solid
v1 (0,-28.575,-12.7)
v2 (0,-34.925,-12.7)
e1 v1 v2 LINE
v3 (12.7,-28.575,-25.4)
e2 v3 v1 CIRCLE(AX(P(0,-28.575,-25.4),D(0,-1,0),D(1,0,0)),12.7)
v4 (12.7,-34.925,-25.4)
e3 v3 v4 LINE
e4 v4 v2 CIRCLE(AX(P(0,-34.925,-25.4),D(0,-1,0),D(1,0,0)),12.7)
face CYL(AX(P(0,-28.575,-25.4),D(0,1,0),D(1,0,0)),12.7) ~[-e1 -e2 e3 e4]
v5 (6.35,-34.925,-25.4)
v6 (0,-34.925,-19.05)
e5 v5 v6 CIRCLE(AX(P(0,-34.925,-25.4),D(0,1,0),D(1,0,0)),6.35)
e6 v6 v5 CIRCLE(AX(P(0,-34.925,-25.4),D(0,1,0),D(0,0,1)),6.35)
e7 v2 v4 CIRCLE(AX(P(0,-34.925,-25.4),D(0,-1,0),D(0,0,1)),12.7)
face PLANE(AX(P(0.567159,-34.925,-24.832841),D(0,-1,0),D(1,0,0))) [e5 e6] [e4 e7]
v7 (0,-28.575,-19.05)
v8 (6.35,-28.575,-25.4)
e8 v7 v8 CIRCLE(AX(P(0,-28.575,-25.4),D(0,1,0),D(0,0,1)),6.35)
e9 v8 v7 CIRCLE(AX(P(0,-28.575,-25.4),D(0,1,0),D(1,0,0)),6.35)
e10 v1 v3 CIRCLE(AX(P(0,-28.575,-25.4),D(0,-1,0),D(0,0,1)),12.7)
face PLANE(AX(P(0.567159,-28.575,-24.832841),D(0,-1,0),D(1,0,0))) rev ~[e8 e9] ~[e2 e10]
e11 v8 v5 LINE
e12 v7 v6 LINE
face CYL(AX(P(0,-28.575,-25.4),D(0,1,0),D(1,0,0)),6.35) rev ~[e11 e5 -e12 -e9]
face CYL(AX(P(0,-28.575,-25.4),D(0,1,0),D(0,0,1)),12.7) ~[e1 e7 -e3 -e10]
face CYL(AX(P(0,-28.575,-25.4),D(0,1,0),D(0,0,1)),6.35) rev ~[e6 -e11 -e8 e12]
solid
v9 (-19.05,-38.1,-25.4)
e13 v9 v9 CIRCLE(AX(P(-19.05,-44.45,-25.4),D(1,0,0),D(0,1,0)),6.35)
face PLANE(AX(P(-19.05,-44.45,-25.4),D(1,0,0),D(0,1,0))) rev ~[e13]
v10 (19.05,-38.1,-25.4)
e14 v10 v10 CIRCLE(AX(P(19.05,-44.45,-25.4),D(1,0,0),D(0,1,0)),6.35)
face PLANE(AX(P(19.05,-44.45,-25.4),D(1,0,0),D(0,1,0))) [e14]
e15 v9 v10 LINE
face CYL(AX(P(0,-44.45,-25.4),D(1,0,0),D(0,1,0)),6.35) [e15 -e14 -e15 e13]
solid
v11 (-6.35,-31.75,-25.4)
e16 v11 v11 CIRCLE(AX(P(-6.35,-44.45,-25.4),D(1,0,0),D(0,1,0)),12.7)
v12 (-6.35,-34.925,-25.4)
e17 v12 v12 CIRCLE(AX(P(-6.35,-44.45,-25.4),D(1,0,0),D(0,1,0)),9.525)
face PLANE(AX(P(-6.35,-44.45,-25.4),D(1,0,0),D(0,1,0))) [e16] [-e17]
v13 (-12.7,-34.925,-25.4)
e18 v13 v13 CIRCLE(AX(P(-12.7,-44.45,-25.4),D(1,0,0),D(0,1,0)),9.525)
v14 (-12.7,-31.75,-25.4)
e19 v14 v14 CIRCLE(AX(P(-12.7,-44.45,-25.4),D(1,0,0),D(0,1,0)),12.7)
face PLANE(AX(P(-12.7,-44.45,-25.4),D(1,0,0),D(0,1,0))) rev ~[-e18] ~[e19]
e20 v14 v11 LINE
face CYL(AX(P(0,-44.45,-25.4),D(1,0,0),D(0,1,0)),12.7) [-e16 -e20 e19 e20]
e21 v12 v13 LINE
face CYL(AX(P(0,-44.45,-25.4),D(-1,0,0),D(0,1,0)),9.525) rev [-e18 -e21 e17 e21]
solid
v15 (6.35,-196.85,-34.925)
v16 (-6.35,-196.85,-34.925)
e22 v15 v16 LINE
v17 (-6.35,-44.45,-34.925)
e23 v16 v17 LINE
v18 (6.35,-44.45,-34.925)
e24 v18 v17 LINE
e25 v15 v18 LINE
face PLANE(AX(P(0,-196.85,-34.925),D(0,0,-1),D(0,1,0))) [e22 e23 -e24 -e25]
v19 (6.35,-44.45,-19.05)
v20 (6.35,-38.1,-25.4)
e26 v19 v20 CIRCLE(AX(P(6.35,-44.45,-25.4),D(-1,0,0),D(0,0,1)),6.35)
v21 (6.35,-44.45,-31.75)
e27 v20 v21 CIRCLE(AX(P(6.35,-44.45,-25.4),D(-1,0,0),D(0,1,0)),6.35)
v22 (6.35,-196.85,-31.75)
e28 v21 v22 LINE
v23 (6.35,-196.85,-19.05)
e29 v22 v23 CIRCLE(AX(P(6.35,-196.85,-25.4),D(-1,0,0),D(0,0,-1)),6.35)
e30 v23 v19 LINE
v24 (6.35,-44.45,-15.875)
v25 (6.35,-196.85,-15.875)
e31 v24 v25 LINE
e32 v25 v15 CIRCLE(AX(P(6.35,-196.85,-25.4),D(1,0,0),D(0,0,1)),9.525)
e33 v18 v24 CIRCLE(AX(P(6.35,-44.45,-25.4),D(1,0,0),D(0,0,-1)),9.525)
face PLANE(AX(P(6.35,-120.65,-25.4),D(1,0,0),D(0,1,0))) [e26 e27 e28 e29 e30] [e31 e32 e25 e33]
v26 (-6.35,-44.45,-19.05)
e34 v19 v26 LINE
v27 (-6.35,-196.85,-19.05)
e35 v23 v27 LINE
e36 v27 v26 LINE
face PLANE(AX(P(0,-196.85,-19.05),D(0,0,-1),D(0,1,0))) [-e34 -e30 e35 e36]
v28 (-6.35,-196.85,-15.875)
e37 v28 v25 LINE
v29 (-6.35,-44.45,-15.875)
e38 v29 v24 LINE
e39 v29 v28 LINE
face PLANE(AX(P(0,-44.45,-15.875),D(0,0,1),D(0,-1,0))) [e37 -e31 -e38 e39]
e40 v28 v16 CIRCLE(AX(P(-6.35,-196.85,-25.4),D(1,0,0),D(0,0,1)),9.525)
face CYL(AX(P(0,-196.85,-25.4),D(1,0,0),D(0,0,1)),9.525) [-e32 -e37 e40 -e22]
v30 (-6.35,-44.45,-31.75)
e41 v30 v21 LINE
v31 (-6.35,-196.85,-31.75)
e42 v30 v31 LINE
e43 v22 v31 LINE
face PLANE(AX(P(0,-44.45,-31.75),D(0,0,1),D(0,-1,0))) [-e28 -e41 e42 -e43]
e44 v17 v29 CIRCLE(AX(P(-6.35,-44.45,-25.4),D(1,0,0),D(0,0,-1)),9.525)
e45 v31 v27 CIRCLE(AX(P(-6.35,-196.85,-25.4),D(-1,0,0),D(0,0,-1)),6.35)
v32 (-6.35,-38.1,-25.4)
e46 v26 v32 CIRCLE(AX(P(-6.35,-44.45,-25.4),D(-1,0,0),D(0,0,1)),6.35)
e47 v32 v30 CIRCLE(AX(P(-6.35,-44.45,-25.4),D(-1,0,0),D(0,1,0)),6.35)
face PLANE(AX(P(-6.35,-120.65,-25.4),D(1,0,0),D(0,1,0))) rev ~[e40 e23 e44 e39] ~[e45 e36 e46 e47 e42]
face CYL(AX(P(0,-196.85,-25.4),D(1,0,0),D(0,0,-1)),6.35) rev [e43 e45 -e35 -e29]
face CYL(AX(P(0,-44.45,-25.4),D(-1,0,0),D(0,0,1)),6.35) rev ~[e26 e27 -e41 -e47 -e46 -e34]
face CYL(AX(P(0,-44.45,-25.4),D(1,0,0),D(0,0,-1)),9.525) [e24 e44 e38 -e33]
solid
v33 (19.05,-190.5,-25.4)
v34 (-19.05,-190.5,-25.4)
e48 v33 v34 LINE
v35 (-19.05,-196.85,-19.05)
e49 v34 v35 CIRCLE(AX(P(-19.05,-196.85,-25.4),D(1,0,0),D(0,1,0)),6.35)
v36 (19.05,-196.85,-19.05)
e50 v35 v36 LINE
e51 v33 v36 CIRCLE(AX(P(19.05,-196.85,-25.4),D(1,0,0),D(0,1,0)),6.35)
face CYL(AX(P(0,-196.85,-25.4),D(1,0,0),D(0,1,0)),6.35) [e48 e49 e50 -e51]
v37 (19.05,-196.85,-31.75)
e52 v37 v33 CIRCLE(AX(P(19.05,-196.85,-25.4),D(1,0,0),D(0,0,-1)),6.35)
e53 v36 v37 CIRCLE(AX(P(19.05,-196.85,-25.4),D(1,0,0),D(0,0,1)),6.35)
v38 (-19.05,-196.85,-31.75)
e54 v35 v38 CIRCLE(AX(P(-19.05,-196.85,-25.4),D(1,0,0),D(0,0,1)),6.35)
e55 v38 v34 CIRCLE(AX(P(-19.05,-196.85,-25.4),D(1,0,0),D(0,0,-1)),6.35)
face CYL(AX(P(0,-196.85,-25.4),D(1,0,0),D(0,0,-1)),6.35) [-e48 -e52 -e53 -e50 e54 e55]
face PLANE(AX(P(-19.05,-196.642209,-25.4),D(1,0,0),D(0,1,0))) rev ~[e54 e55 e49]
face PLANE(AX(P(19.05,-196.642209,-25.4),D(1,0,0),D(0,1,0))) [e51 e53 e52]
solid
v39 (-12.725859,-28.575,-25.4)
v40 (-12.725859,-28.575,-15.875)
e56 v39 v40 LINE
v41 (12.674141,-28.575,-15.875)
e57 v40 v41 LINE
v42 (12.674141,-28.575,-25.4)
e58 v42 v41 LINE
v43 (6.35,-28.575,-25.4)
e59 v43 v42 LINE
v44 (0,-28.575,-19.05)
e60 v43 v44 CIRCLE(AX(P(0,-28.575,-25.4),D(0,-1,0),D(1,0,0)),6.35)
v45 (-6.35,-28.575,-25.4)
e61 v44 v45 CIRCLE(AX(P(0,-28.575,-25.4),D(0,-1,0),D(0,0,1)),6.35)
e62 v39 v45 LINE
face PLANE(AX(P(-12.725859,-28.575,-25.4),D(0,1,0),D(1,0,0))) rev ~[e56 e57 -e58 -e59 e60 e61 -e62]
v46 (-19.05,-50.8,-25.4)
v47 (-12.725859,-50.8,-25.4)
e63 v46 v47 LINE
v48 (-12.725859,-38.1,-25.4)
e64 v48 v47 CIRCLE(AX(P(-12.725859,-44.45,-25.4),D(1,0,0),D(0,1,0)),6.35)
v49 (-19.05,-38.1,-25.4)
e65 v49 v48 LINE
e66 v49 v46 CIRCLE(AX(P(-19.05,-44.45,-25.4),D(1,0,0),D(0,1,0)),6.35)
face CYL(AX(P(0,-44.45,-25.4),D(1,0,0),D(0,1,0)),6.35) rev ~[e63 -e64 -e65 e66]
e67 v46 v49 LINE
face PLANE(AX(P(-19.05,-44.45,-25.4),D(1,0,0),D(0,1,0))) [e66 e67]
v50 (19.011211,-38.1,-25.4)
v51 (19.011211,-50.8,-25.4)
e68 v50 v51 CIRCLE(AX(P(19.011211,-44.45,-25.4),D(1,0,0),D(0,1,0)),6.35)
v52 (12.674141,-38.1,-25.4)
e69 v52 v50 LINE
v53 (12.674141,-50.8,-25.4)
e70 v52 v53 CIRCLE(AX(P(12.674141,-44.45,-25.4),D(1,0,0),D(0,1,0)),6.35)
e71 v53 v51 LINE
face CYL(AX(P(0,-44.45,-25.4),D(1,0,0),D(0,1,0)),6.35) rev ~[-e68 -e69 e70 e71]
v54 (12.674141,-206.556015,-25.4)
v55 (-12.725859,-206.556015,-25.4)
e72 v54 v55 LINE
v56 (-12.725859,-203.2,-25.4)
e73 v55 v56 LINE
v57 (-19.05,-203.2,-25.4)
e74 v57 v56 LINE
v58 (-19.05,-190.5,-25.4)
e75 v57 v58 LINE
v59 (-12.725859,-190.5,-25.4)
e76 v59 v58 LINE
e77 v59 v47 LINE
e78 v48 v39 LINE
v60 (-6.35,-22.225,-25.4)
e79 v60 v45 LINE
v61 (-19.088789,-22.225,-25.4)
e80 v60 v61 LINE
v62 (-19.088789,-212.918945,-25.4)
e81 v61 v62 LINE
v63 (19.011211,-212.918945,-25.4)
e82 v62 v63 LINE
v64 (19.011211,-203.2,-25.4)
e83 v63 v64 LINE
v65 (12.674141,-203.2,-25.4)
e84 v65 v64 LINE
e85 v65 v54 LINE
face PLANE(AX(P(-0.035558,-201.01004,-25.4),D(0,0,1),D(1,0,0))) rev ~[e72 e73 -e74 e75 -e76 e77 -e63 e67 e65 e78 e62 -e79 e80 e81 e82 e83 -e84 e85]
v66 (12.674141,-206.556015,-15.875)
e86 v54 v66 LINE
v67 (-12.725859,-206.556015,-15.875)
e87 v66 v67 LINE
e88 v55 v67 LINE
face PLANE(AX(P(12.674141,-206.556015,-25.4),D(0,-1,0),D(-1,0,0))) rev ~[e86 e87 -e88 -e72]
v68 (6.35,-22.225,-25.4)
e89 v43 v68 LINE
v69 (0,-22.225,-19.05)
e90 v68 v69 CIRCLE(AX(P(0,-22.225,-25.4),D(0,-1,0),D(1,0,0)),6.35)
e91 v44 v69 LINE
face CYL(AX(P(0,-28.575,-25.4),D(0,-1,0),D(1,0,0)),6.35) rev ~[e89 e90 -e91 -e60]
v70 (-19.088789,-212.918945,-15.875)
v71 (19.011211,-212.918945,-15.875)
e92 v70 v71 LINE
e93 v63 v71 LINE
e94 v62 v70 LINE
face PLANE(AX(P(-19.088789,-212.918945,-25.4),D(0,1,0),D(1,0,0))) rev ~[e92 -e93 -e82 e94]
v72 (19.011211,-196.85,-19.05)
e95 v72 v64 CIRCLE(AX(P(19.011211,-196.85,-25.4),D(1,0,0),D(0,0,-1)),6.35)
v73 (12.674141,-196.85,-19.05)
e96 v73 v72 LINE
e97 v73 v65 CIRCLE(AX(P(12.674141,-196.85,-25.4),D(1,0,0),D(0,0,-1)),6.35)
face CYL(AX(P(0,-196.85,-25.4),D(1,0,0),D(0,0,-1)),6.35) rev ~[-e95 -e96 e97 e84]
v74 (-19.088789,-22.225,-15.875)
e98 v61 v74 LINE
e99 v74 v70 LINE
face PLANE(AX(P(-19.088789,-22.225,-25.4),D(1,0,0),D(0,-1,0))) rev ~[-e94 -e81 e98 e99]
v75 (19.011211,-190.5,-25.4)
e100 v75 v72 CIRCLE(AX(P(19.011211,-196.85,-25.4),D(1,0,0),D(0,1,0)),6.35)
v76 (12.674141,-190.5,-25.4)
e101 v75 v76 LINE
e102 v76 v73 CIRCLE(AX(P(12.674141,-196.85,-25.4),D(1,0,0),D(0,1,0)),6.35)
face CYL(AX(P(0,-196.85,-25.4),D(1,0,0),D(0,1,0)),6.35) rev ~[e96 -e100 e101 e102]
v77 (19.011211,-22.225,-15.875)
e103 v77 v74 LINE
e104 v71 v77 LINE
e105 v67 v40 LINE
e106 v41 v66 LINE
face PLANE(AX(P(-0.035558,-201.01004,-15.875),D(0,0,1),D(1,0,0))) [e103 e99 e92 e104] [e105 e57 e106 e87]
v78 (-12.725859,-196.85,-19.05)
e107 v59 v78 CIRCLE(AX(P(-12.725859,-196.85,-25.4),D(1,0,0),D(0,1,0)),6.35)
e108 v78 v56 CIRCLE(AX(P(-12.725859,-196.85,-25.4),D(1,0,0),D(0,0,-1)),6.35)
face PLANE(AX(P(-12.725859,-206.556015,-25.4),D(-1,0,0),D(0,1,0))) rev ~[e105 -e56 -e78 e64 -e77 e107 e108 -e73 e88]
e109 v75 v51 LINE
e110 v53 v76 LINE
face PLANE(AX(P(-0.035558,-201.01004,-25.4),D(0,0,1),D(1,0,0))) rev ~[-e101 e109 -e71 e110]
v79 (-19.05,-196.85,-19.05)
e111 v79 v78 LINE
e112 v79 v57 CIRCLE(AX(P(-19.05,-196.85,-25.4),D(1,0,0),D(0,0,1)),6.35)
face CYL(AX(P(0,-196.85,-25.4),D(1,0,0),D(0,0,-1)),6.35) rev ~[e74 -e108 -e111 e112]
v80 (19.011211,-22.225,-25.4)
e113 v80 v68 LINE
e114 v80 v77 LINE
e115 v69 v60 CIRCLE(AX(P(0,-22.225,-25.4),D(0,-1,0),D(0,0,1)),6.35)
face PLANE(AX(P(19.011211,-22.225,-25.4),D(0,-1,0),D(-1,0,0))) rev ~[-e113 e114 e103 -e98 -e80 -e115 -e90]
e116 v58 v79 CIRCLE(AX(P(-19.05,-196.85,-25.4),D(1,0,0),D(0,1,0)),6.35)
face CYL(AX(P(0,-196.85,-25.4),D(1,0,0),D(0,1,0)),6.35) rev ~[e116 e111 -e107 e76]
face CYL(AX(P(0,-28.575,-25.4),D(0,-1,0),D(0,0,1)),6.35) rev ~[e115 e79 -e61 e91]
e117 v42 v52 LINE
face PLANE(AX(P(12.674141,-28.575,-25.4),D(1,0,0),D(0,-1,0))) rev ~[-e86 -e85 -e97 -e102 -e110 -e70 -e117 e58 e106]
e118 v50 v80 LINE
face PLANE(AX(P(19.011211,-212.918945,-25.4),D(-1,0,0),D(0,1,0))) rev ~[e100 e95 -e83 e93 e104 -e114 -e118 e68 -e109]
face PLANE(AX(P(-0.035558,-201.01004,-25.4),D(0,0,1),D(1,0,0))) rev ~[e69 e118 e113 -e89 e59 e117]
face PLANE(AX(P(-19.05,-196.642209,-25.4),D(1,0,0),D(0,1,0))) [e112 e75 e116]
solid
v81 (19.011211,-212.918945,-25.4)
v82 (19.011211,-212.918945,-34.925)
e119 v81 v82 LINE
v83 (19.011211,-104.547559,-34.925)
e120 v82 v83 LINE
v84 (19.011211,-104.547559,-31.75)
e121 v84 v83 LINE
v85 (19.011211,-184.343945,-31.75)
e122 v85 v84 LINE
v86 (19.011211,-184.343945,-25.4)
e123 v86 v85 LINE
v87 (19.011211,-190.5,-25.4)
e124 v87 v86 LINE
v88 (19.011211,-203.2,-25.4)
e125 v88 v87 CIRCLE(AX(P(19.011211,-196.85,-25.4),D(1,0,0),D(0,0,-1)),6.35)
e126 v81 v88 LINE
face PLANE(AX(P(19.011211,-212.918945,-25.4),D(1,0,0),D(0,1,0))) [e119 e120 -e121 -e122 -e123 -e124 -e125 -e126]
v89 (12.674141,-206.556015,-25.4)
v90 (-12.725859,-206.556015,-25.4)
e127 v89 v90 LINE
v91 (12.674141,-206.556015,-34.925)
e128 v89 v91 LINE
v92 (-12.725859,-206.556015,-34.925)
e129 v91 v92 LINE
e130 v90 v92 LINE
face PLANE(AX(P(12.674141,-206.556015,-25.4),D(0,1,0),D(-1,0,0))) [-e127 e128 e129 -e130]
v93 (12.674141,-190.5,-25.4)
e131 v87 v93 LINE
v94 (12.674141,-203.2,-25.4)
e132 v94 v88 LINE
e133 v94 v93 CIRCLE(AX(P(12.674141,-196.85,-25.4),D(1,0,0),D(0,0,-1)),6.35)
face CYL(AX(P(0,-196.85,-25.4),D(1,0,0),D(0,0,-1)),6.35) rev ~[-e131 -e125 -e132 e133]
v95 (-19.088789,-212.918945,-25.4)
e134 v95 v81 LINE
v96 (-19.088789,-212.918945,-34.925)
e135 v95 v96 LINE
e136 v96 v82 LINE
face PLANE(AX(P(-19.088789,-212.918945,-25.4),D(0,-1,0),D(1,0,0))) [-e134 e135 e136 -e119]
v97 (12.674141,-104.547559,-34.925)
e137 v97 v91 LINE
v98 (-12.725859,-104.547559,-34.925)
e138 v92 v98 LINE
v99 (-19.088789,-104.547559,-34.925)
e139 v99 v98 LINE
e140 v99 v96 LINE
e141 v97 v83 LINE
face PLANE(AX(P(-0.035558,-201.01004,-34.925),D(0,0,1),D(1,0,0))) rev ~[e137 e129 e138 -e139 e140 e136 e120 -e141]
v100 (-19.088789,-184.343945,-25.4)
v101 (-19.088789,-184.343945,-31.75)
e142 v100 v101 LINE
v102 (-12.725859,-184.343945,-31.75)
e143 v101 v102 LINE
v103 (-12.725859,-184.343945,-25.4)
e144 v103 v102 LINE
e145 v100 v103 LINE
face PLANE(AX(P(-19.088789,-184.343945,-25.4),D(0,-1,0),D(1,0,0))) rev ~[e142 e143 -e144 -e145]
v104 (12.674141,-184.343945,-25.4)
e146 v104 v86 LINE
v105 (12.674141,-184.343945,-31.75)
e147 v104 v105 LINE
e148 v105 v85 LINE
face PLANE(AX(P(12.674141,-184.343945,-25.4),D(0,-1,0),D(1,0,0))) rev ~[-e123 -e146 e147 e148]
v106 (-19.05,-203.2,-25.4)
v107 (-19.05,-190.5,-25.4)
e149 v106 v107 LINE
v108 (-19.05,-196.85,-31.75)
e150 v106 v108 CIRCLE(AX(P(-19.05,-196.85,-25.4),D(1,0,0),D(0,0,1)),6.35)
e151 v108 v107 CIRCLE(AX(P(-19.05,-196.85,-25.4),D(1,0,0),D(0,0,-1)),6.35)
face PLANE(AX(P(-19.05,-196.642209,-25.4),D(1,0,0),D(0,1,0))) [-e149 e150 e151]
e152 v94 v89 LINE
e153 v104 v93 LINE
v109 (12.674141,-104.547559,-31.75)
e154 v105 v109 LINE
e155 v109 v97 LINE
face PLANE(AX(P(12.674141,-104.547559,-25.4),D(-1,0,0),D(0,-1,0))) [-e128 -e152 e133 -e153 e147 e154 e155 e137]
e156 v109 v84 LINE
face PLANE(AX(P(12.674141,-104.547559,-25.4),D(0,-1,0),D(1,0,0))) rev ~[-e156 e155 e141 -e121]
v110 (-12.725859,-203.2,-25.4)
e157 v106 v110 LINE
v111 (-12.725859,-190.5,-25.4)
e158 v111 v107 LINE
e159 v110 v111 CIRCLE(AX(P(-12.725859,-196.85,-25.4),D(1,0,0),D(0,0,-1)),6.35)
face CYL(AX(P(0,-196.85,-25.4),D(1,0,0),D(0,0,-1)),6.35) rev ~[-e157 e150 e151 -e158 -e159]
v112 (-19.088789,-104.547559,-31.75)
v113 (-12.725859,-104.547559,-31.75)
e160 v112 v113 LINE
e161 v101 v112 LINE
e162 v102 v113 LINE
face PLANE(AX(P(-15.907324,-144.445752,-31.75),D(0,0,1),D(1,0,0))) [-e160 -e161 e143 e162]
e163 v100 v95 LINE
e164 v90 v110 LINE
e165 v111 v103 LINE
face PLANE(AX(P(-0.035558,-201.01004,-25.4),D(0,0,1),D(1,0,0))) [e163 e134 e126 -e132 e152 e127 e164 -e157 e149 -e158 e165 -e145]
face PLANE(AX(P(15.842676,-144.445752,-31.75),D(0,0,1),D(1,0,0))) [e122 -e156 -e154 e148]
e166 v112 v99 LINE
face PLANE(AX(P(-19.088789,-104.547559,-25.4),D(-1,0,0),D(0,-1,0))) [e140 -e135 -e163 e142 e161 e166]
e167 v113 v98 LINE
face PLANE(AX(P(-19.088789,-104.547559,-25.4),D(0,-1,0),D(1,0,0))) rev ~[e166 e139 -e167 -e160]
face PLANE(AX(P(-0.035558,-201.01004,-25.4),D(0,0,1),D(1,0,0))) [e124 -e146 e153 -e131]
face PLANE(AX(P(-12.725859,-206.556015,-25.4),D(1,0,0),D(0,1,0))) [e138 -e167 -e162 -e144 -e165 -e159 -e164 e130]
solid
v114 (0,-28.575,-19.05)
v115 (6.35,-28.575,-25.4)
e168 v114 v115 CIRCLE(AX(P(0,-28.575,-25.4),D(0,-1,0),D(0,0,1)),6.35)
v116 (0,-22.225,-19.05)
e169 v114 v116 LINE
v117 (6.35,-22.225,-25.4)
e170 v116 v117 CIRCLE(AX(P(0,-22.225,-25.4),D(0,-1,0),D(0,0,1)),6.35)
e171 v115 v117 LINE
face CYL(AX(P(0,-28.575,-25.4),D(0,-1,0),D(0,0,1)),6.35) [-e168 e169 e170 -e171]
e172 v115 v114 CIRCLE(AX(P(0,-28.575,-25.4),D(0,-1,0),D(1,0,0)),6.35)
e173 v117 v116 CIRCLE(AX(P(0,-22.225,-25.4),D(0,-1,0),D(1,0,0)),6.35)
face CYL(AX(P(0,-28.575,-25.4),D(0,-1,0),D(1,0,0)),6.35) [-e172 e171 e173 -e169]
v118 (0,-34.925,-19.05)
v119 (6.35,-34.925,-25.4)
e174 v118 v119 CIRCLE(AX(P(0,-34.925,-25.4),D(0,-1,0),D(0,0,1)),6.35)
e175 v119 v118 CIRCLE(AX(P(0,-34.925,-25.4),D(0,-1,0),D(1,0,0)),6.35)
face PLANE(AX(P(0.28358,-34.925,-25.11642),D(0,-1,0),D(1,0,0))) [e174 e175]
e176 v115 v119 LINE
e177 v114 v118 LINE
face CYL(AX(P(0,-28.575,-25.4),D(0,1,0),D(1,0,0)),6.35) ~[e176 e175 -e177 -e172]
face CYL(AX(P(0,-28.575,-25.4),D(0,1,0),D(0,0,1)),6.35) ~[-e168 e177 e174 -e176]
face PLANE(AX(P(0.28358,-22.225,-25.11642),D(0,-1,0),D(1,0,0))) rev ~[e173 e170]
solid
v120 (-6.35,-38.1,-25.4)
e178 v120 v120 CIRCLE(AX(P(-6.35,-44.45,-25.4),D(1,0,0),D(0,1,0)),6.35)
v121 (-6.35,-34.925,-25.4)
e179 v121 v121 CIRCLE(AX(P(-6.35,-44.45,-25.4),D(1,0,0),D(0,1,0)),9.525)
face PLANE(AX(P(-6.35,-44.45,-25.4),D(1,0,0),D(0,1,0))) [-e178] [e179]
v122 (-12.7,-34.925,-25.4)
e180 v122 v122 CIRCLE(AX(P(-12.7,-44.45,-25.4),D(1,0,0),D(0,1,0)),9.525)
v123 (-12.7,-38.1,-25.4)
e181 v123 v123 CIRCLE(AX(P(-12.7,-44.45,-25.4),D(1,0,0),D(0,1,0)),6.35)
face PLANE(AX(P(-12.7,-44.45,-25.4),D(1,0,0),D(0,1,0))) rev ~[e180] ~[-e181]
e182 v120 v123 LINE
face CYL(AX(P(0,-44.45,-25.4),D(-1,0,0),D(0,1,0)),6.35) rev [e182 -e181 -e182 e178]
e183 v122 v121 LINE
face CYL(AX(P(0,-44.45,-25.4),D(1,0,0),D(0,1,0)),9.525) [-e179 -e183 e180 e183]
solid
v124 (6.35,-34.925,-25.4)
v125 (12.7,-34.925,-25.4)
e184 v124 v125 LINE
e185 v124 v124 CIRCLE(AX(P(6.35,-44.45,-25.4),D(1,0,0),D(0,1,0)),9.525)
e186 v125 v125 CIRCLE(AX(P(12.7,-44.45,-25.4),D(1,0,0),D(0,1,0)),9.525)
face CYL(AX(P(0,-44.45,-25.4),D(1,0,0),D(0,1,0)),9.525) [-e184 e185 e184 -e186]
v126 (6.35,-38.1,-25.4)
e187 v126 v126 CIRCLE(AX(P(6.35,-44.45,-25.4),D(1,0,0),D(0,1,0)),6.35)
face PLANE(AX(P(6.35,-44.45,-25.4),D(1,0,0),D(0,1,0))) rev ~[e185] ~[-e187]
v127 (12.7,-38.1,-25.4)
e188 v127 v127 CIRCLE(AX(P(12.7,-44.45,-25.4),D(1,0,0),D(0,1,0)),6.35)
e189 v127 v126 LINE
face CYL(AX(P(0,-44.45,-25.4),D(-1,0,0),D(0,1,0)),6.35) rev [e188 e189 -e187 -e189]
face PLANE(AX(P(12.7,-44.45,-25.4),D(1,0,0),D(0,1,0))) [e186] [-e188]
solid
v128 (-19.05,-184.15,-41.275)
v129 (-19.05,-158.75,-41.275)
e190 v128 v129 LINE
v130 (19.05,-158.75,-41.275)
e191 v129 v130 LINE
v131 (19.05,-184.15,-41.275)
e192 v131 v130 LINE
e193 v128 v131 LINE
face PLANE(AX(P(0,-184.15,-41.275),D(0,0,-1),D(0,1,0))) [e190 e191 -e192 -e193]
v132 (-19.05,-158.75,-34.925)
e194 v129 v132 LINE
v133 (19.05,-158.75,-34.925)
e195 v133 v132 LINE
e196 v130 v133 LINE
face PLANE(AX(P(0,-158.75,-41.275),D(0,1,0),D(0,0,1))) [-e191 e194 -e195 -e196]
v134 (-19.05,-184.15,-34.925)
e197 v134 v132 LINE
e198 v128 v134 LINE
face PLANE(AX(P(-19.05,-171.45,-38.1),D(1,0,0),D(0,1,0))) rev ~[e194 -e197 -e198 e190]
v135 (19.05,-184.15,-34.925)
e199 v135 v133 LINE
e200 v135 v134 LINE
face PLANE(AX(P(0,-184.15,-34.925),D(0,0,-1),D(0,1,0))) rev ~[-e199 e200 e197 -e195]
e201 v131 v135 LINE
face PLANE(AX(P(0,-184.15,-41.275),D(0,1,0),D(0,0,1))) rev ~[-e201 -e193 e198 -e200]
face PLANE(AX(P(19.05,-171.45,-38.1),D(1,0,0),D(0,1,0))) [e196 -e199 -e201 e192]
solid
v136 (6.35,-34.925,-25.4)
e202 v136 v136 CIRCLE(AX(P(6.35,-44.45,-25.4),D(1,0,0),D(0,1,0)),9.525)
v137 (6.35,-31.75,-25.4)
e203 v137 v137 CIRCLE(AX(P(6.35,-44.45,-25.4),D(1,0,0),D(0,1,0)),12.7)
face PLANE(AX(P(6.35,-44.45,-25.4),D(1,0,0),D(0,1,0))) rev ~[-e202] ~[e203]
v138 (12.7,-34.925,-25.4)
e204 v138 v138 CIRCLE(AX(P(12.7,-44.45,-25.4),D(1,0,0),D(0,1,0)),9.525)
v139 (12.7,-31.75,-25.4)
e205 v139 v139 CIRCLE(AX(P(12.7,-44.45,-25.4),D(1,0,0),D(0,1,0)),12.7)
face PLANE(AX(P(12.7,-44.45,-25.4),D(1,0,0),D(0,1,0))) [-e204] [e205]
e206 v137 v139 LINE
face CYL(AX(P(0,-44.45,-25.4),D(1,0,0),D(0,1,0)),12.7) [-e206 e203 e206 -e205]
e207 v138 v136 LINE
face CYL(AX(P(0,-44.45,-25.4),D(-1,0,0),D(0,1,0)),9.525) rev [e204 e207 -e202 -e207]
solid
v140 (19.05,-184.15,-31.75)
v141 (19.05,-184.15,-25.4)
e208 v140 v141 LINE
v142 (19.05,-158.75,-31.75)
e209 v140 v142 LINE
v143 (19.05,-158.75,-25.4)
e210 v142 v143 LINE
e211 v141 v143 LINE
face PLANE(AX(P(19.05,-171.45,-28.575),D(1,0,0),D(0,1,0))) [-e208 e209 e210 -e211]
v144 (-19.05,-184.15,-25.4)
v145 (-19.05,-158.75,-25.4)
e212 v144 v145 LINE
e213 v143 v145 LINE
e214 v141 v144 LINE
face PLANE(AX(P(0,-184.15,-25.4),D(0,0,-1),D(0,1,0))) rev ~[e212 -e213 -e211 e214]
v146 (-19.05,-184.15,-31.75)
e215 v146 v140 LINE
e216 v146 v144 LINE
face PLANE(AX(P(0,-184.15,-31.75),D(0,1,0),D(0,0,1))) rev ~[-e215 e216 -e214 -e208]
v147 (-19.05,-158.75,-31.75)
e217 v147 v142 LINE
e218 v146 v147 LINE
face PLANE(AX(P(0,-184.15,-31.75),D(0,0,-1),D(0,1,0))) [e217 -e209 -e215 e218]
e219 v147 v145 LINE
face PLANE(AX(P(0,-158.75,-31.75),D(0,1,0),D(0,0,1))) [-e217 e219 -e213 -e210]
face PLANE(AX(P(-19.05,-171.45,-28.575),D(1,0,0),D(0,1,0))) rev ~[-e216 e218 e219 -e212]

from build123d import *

# Parameters (mm, degrees)
F2_DEPTH  = 6.35
F3_R      = 12.7
F3_R_2    = 9.525
F4_DEPTH  = 12.7
F5_DEPTH  = 6.35
F3_R_3    = 6.35
F6_DEPTH  = 19.05
F7_DEPTH  = 12.7
F8_DEPTH  = 6.35
F10_DEPTH = 6.35
F11_DEPTH = 19.05
F9_W      = 25.4
F9_H      = 6.35
F12_DEPTH = 19.05
F13_DEPTH = 6.35
F15_W     = 6.3629296671
F15_H     = 79.796386
F15_W_2   = 6.3370703329
F16_DEPTH = 9.525
F17_DEPTH = 6.35
F18_DEPTH = 9.525


# Not quite as in the source:
# - a feature names something its author has since deleted; it is built from what else it names


with BuildPart() as f2:
    # F1 (on offset) → F2 (new body)
    with BuildSketch(Plane.XZ.offset(28.575)):
        with BuildLine():
            ThreePointArc((12.7, -25.4), (8.9802561211, -16.4197438789), (0, -12.7))
            ThreePointArc((0, -12.7), (-8.9802561211, -34.3802561211), (12.7, -25.4))
        make_face()
        with BuildLine():
            ThreePointArc((6.35, -25.4), (-4.4901280605, -29.8901280605), (0, -19.05))
            ThreePointArc((0, -19.05), (4.4901280605, -20.9098719395), (6.35, -25.4))
        make_face(mode=Mode.SUBTRACT)
    extrude(amount=F2_DEPTH)


with BuildPart() as f4:
    # F3 (on Right) → F4 (new body, symmetric)
    with BuildSketch(Plane.YZ):
        with Locations((-44.45, -25.4)):
            Circle(F3_R)
        with Locations((-44.45, -25.4)):
            Circle(F3_R_2, mode=Mode.SUBTRACT)
    extrude(amount=F4_DEPTH, both=True)

    # F3 (on Right) → F5 (cut, symmetric)
    with BuildSketch(Plane.YZ):
        with Locations((-44.45, -25.4)):
            Circle(F3_R)
        with Locations((-44.45, -25.4)):
            Circle(F3_R_2, mode=Mode.SUBTRACT)
    extrude(amount=F5_DEPTH, both=True, mode=Mode.SUBTRACT)


with BuildPart() as f6:
    # F3 (on Right) → F6 (new body, symmetric)
    with BuildSketch(Plane.YZ):
        with Locations((-44.45, -25.4)):
            Circle(F3_R_3)
    extrude(amount=F6_DEPTH, both=True)


with BuildPart() as f7:
    # F3 (on Right) → F7 (new body, symmetric)
    with BuildSketch(Plane.YZ):
        with Locations((-44.45, -25.4)):
            Circle(F3_R_2)
        with Locations((-44.45, -25.4)):
            Circle(F3_R_3, mode=Mode.SUBTRACT)
    extrude(amount=F7_DEPTH, both=True)

    # F3 (on Right) → F8 (cut, symmetric)
    with BuildSketch(Plane.YZ):
        with Locations((-44.45, -25.4)):
            Circle(F3_R_2)
        with Locations((-44.45, -25.4)):
            Circle(F3_R_3, mode=Mode.SUBTRACT)
    extrude(amount=F8_DEPTH, both=True, mode=Mode.SUBTRACT)


with BuildPart() as f10:
    # F9 (on Right) → F10 (new body, symmetric)
    with BuildSketch(Plane.YZ):
        with BuildLine():
            Line((-158.75, -34.925), (-44.45, -34.925))
            ThreePointArc((-44.45, -34.925), (-34.925, -25.4), (-44.45, -15.875))
            Line((-44.45, -15.875), (-196.85, -15.875))
            ThreePointArc((-196.85, -15.875), (-206.375, -25.4), (-196.85, -34.925))
            Line((-196.85, -34.925), (-184.15, -34.925))
            Line((-184.15, -34.925), (-158.75, -34.925))
        make_face()
        with BuildLine():
            ThreePointArc((-44.45, -19.05), (-39.9598719395, -20.9098719395), (-38.1, -25.4))
            ThreePointArc((-38.1, -25.4), (-39.9598719395, -29.8901280605), (-44.45, -31.75))
            Line((-44.45, -31.75), (-158.75, -31.75))
            Line((-158.75, -31.75), (-184.15, -31.75))
            Line((-184.15, -31.75), (-196.85, -31.75))
            ThreePointArc((-196.85, -31.75), (-203.2, -25.4), (-196.85, -19.05))
            Line((-196.85, -19.05), (-44.45, -19.05))
        make_face(mode=Mode.SUBTRACT)
    extrude(amount=F10_DEPTH, both=True)


with BuildPart() as f11:
    # F9 (on Right) → F11 (new body, symmetric)
    with BuildSketch(Plane.YZ):
        with BuildLine():
            ThreePointArc((-190.5, -25.4), (-192.3598719395, -20.9098719395), (-196.85, -19.05))
            ThreePointArc((-196.85, -19.05), (-203.2, -25.4), (-196.85, -31.75))
            ThreePointArc((-196.85, -31.75), (-192.3598719395, -29.8901280605), (-190.5, -25.4))
        make_face()
    extrude(amount=F11_DEPTH, both=True)


with BuildPart() as f12:
    # F9 (on Right) → F12 (new body, symmetric)
    with BuildSketch(Plane.YZ):
        with Locations((-171.45, -28.575)):
            Rectangle(F9_W, F9_H)
    extrude(amount=F12_DEPTH, both=True)


with BuildPart() as f12b:
    # F9 (on Right) → F12, piece 2 (new body, symmetric)
    with BuildSketch(Plane.YZ):
        with Locations((-171.45, -38.1)):
            Rectangle(F9_W, F9_H)
    extrude(amount=F12_DEPTH, both=True)


with BuildPart() as f13:
    # F1 (on offset) → F13 (new body, symmetric)
    with BuildSketch(Plane.XZ.offset(28.575)):
        with BuildLine():
            ThreePointArc((6.35, -25.4), (4.4901280605, -20.9098719395), (0, -19.05))
            ThreePointArc((0, -19.05), (-4.4901280605, -29.8901280605), (6.35, -25.4))
        make_face()
    extrude(amount=F13_DEPTH, both=True)


with BuildPart() as f16:
    # F15 (on offset) → F16 (new body)
    with BuildSketch(Plane.XY.offset(-25.4)):
        Polygon((-19.0887890014, -184.3439450068), (-19.0887890014, -212.9189450068), (19.0112109986, -212.9189450068), (19.0112109986, -184.3439450068), (12.6741406658, -184.3439450068), (12.6741406658, -206.5560153396), (-12.7258593342, -206.5560153396), (-12.7258593342, -184.3439450068), align=None)
        with Locations((-15.9073241678, -144.4457520068)):
            Rectangle(F15_W, F15_H)
        with Locations((15.8426758322, -144.4457520068)):
            Rectangle(F15_W_2, F15_H)
    extrude(amount=-F16_DEPTH)

    # F15 (on offset) → F17 (cut)
    with BuildSketch(Plane.XY.offset(-25.4)):
        with Locations((-15.9073241678, -144.4457520068)):
            Rectangle(F15_W, F15_H)
        with Locations((15.8426758322, -144.4457520068)):
            Rectangle(F15_W_2, F15_H)
    extrude(amount=-F17_DEPTH, mode=Mode.SUBTRACT)

    # F19: cut F11, F6, F13
    add(f11.part, mode=Mode.SUBTRACT)
    add(f6.part, mode=Mode.SUBTRACT)
    add(f13.part, mode=Mode.SUBTRACT)


with BuildPart() as f18:
    # F15 (on offset) → F18 (new body)
    with BuildSketch(Plane.XY.offset(-25.4)):
        Polygon((-19.0887890014, -184.3439450068), (-19.0887890014, -212.9189450068), (19.0112109986, -212.9189450068), (19.0112109986, -184.3439450068), (12.6741406658, -184.3439450068), (12.6741406658, -206.5560153396), (-12.7258593342, -206.5560153396), (-12.7258593342, -184.3439450068), align=None)
        Polygon((-19.0887890014, -22.225), (-19.0887890014, -104.5475590068), (-12.7258593342, -104.5475590068), (-12.7258593342, -28.575), (-12.7, -28.575), (12.6741406658, -28.575), (12.6741406658, -104.5475590068), (19.0112109986, -104.5475590068), (19.0112109986, -22.225), align=None)
        with Locations((-15.9073241678, -144.4457520068)):
            Rectangle(F15_W, F15_H)
        with Locations((15.8426758322, -144.4457520068)):
            Rectangle(F15_W_2, F15_H)
    extrude(amount=F18_DEPTH)

    # F19: cut F11, F6, F13
    add(f11.part, mode=Mode.SUBTRACT)
    add(f6.part, mode=Mode.SUBTRACT)
    add(f13.part, mode=Mode.SUBTRACT)


solid = Compound([f2.part, f4.part, f6.part, f7.part, f10.part, f11.part, f12.part, f12b.part, f13.part, f16.part, f18.part])
